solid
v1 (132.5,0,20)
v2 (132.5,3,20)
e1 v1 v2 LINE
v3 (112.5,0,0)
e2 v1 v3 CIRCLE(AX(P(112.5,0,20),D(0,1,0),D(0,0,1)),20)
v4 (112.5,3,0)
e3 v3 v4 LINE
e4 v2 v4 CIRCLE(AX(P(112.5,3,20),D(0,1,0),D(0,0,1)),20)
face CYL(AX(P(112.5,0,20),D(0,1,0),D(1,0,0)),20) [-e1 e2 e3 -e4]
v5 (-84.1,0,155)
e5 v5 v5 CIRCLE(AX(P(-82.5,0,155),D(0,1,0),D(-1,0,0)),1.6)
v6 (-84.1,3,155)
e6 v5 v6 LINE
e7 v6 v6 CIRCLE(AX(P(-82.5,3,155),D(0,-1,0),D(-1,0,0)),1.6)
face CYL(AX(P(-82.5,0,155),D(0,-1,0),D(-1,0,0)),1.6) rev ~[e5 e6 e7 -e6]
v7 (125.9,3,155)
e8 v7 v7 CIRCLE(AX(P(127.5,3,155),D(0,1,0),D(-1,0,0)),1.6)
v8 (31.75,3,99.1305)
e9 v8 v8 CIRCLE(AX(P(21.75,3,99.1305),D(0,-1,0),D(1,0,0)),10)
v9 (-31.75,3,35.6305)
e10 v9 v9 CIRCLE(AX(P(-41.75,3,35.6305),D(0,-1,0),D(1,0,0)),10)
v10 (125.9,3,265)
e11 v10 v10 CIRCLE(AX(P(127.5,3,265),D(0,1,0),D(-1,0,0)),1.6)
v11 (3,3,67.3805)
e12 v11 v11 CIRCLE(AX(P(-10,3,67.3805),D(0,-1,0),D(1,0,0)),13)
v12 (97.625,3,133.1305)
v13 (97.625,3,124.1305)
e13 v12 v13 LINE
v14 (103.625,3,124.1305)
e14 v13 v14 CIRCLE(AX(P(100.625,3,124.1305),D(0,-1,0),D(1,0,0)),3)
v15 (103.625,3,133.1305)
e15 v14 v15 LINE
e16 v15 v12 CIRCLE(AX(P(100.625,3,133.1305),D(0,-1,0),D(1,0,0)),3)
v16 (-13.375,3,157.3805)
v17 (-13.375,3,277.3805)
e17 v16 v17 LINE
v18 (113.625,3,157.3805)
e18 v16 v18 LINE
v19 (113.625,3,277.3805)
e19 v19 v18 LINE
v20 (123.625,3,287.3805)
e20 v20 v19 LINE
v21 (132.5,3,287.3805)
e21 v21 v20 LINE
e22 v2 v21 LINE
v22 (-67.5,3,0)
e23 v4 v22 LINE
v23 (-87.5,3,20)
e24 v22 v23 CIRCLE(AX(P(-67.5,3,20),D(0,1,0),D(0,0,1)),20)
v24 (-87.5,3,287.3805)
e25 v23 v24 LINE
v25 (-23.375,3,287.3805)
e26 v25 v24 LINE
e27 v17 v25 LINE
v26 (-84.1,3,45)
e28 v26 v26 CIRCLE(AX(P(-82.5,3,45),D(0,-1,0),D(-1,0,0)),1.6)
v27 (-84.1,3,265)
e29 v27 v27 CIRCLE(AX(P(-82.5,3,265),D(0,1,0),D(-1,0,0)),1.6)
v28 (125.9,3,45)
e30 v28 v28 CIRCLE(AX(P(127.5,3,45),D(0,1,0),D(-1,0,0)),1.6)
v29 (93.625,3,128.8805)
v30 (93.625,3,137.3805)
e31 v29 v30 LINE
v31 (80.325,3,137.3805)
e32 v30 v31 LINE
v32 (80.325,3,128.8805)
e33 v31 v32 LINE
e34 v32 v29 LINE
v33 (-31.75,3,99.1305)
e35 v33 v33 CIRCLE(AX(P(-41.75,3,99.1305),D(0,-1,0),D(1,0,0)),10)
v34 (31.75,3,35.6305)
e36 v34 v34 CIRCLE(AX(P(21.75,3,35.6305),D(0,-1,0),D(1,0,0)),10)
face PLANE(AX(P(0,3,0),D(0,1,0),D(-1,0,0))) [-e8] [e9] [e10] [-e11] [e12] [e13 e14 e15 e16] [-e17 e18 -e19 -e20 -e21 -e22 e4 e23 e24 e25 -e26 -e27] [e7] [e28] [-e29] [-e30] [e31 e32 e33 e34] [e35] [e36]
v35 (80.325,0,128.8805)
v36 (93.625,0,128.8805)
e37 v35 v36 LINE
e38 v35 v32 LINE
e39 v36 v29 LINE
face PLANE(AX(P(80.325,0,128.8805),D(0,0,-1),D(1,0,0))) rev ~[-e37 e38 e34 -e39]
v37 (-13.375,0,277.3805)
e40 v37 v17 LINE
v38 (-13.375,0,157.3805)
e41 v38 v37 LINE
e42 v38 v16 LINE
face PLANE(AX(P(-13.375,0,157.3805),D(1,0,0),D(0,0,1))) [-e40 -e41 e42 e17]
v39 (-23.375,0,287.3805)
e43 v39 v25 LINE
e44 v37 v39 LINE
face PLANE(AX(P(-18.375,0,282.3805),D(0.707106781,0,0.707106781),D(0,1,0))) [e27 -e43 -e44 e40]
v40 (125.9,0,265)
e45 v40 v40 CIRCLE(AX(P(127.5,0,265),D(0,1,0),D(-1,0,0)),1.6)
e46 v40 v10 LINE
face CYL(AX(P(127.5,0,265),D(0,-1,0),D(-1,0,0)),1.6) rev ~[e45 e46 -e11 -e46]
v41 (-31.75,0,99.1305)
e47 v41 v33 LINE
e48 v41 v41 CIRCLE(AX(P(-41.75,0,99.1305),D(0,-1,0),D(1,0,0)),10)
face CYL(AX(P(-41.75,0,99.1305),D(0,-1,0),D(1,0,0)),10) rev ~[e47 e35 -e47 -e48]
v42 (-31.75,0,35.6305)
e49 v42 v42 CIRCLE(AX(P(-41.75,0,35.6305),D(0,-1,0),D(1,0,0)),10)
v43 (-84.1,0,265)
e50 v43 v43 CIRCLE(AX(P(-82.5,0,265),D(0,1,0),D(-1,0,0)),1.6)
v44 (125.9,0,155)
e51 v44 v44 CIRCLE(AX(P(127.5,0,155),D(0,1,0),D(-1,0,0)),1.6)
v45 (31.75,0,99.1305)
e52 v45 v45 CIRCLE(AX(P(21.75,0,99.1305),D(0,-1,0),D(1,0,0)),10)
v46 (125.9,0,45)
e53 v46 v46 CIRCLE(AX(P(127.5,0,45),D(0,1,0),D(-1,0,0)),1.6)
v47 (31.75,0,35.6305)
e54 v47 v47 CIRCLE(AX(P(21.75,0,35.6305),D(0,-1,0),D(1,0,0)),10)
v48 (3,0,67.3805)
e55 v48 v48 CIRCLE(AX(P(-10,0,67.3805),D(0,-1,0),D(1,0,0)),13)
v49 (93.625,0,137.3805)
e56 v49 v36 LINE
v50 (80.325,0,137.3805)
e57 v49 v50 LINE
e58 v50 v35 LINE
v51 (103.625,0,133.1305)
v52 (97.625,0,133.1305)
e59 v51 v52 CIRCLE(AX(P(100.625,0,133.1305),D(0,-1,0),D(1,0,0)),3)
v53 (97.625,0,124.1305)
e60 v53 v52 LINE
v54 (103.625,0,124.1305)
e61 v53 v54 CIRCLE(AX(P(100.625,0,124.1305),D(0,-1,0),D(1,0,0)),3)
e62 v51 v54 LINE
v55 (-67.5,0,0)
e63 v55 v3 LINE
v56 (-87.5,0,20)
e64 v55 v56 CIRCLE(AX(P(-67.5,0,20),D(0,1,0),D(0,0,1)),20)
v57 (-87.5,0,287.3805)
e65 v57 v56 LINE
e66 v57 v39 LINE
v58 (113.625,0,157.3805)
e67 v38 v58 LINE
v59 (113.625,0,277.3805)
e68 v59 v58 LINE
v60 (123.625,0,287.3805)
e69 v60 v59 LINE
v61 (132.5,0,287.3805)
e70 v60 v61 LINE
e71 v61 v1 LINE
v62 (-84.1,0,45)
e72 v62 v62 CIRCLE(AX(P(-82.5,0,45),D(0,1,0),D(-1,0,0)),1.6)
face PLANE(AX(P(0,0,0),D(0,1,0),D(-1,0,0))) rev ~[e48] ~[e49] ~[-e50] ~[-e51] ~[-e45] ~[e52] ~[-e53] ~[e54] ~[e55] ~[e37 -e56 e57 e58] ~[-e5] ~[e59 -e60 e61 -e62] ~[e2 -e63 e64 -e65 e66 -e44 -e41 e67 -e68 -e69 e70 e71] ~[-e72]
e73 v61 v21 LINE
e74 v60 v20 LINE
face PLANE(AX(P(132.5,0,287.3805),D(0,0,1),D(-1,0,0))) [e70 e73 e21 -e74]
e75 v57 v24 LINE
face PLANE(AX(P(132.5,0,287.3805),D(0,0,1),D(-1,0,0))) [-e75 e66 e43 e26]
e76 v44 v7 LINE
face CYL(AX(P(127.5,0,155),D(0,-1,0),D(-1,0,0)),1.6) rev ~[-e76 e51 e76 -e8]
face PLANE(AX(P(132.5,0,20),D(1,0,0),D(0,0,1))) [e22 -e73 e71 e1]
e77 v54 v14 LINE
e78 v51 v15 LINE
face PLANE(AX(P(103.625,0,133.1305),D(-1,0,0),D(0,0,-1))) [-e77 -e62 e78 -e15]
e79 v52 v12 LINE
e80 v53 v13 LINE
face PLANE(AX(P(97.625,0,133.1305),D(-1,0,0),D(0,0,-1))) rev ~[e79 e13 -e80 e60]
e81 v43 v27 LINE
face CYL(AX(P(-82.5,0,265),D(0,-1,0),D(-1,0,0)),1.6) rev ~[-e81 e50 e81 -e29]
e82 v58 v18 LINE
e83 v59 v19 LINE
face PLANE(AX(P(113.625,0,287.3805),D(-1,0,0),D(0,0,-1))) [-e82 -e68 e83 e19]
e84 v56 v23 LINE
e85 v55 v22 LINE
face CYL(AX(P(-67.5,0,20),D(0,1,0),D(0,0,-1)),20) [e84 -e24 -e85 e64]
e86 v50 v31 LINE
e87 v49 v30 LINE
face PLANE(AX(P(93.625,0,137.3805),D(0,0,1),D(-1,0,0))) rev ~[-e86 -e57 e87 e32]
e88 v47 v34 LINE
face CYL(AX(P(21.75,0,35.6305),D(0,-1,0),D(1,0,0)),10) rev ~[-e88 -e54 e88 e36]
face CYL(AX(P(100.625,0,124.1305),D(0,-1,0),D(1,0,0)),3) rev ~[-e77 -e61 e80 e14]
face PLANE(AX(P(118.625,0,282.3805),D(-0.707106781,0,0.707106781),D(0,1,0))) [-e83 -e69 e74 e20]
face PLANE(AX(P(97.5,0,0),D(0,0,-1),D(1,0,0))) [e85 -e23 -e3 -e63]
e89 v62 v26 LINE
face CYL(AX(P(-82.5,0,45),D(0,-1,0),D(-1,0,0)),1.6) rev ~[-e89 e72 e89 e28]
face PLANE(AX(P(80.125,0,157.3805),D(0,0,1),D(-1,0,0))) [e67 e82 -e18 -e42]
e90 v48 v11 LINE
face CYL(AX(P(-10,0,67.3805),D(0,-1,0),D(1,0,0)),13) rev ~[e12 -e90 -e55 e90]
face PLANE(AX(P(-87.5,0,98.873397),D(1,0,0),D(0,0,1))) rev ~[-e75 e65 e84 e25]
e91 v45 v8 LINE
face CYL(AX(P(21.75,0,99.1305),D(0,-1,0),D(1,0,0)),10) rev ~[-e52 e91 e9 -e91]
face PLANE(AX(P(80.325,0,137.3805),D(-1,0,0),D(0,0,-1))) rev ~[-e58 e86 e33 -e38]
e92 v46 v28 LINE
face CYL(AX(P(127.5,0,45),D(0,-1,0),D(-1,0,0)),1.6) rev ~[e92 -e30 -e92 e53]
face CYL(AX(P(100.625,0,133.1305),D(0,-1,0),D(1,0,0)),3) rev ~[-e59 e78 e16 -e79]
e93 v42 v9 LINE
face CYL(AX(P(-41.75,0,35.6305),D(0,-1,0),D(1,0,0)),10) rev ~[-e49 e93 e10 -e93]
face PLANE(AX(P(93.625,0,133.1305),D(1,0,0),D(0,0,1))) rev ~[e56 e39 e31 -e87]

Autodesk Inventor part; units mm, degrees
ref_plane "YZ Plane" through (0, 0, 0) normal (1, 0, 0) x (0, 1, 0)
ref_plane "XZ Plane" through (0, 0, 0) normal (0, 1, 0) x (-1, 0, 0)
ref_plane "XY Plane" through (0, 0, 0) normal (0, 0, 1) x (1, 0, 0)
sketch "Sketch1" plane through (0, 0, 0) normal (0, 1, 0) x (-1, 0, 0)
  line L0 (-132.5, 287.3805) -> (-122.5, 287.3805)
  line L1 (-132.5, 20) -> (-132.5, 287.3805)
  line L2 (-122.5, 20) -> (-122.5, 287.3805)
  line L3 (77.5, 287.3805) -> (87.5, 287.3805)
  line L4 (77.5, 20) -> (77.5, 287.3805)
  line L5 (87.5, 20) -> (87.5, 287.3805)
  line L6 (82.5, 0) -> (127.5, 0) construction
  line L7 (-132.5, 20) -> (-132.5, 287.3805)
  line L8 (82.5, 45) -> (-127.5, 45)
  line L9 (82.5, 155) -> (-127.5, 155)
  circle A0 centre (-127.5, 265) radius 1.6
  circle A1 centre (-127.5, 155) radius 1.6
  circle A2 centre (-127.5, 45) radius 1.6
  circle A3 centre (82.5, 45) radius 1.6
  circle A4 centre (82.5, 155) radius 1.6
  circle A5 centre (82.5, 265) radius 1.6
  line L10 (-132.5, 287.3805) -> (87.5, 287.3805)
  line L11 (87.5, 287.3805) -> (87.5, 0)
  line L12 (87.5, 0) -> (-132.5, 0)
  line L13 (-132.5, 0) -> (-132.5, 287.3805)
  line L14 (87.5, 0) -> (-132.5, 0)
  line L15 (-132.5, 0) -> (-132.5, -22.8)
  line L16 (-132.5, -22.8) -> (87.5, -22.8)
  line L17 (87.5, -22.8) -> (87.5, 0)
  arc A6 (6, 100) -> (0, 94) centre (6, 94) ccw
  line L18 (0, 0) -> (0, 94)
  line L19 (0, 0) -> (90, 0)
  line L20 (90, 0) -> (90, 94)
  arc A7 (90, 94) -> (84, 100) centre (84, 94) ccw
  line L21 (6, 100) -> (84, 100)
  circle A8 centre (45, 47.3805) radius 11
  circle A9 centre (76.75, 79.1305) radius 5.75
  circle A10 centre (13.25, 15.6305) radius 5.75
  circle A11 centre (76.75, 15.6305) radius 5.75
  circle A12 centre (13.25, 79.1305) radius 5.75
  circle A13 centre (117.5, 135) radius 1.8
  line L22 (112.5, 267.3805) -> (122.5, 267.3805)
  line L23 (112.5, 0) -> (112.5, 267.3805)
  line L24 (112.5, 0) -> (122.5, 0)
  line L25 (122.5, 0) -> (122.5, 267.3805)
  circle A14 centre (117.5, 25) radius 1.8
  circle A15 centre (117.5, 245) radius 1.8
  circle A16 centre (-92.5, 135) radius 1.8
  line L26 (-97.5, 267.3805) -> (-87.5, 267.3805)
  line L27 (-97.5, 0) -> (-97.5, 267.3805)
  line L28 (-97.5, 0) -> (-87.5, 0)
  line L29 (-87.5, 0) -> (-87.5, 267.3805)
  circle A17 centre (-92.5, 245) radius 1.8
  circle A18 centre (-92.5, 25) radius 1.8
  point P0 (-62.5, 0)
  point P1 (52.5, -20)
  dimension "d0" = 45
  dimension "d2" = 110
  dimension "d4" = 3.2
  dimension "d5" = 3.2
  dimension "d6" = 3.2
  dimension "d7" = 3.2
  dimension "d8" = 3.2
  dimension "d9" = 3.2
  dimension "d12" = 22.8
extrude "Extrusion1" add sketch "Sketch1" along normal blind 3 contours L0 L2 L8 L27 L12 L13 L1 | L10 L4 L9 L29 L26 L27 L2 | L9 L27 L8 L2 | L3 L5 A7 L21 L4 | L27 L26 L29 L9 | L9 L29 L8 L27 | L4 L21 A6 L18 L8 L29 L9 | L27 L8 L29 L12 | L5 L11 L12 L18 L8 A8 L4 A9 L21 A7 | L4 A9 L8 A8 L18 A6 L21 | L29 L8 L18 L12 | A9 L4 | L4 A9 | A8 L8 | L8 A8 | A10 | A11 | A12 | A16 | A17 | A18
fillet "Fillet1" radius 20 2 edges at (132.5, 1.5, 0) (-87.5, 1.5, 0)
sketch "Sketch4" plane through (0, 0, 0) normal (0, -1, 0) x (1, 0, 0)
  line L0 (68.5, 205.2102) -> (31.5, 205.2102)
  line L1 (78.5, 192.2868) -> (21.5, 192.2868)
  line L2 (21.5, 205.2102) -> (31.5, 205.2102)
  line L3 (68.5, 205.2102) -> (78.5, 205.2102)
  line L4 (78.5, 205.2102) -> (78.5, 192.2868)
  line L5 (21.5, 192.2868) -> (21.5, 205.2102)
  circle A0 centre (21.75, 99.1305) radius 7.65
  circle A1 centre (-41.75, 99.1305) radius 7.65
  circle A2 centre (21.75, 35.6305) radius 7.65
  arc A3 (10, 67.3805) -> (-30, 67.3805) centre (-10, 67.3805) ccw
  line L6 (10, 67.3805) -> (10, -32.6195)
  line L7 (-30, -32.6195) -> (-30, 67.3805)
  circle A4 centre (-41.75, 35.6305) radius 7.65
  line L8 (-87.5, 20) -> (-87.5, 287.3805)
  line L9 (-87.5, 287.3805) -> (132.5, 287.3805)
  line L10 (132.5, 287.3805) -> (132.5, 20)
  line L11 (112.5, 0) -> (-67.5, 0)
  line L12 (-87.5, 20) -> (-87.5, 287.3805) projected
  line L13 (-87.5, 287.3805) -> (132.5, 287.3805) projected
  circle A5 centre (-41.75, 99.1305) radius 10
  circle A6 centre (21.75, 99.1305) radius 10
  circle A7 centre (-41.75, 35.6305) radius 10
  circle A8 centre (21.75, 35.6305) radius 10
  line L14 (-87.5, 287.3805) -> (132.5, 287.3805) projected
  line L15 (21.75, 287.3805) -> (78.5, 287.3805)
  line L16 (78.5, 287.3805) -> (78.5, 157.3805)
  line L17 (78.5, 157.3805) -> (21.75, 157.3805)
  line L18 (21.75, 157.3805) -> (21.75, 287.3805)
  circle A9 centre (-10, 67.3805) radius 13
  line L19 (80.125, 157.3805) -> (20.125, 157.3805)
  line L20 (20.125, 157.3805) -> (20.125, 287.3805)
  line L21 (20.125, 287.3805) -> (80.125, 287.3805)
  line L22 (80.125, 287.3805) -> (80.125, 157.3805)
  line L23 (80.125, 157.3805) -> (20.125, 287.3805) construction
  line L24 (20.125, 157.3805) -> (80.125, 287.3805) construction
  line L25 (-13.375, 287.3805) -> (113.625, 287.3805)
  line L26 (113.625, 287.3805) -> (113.625, 157.3805)
  line L27 (113.625, 157.3805) -> (-13.375, 157.3805)
  line L28 (-13.375, 157.3805) -> (-13.375, 287.3805)
  line L29 (-13.375, 287.3805) -> (113.625, 157.3805) construction
  line L30 (113.625, 287.3805) -> (-13.375, 157.3805) construction
  point P0 (0, 0)
  point P1 (50.125, 222.3805)
  dimension "d24" = 20
  dimension "d25" = 20
  dimension "d26" = 20
  dimension "d27" = 20
  dimension "d28" = 130
  dimension "d29" = 26
  dimension "d36" = 60
  dimension "d37" = 130
  dimension "d38" = 127
extrude "Extrusion3" cut sketch "Sketch4" against normal up to surface (3 mm away) contours L3 L4 L1 L18 L2 L0 | L0 L2 L18 L9 L16 L3 | L16 L9 L22 L19 L4 | L18 L1 L5 L2 | L2 L5 L1 L18 L19 L20 L9 | L16 L17 L18 L1 | L9 L26 L27 L22 | L20 L27 L28 L9 | A0 | A1 | A2 | A4 | A5 | A6 | A7 | A8 | A9
chamfer "Chamfer1" distance 10 angle 45 2 edges at (-13.375, 1.5, 287.3805) (113.625, 1.5, 287.3805)
sketch "Sketch5" plane through (0, 0, 0) normal (0, -1, 0) x (1, 0, 0)
  line L0 (113.625, 157.3805) -> (-13.375, 157.3805) projected
  line L1 (113.625, 157.3805) -> (93.625, 157.3805)
  line L2 (93.625, 157.3805) -> (93.625, 137.3805)
  line L3 (93.625, 137.3805) -> (80.325, 137.3805)
  line L4 (80.325, 137.3805) -> (80.325, 128.8805)
  line L5 (80.325, 128.8805) -> (93.625, 128.8805)
  line L6 (93.625, 128.8805) -> (93.625, 137.3805)
  line L7 (93.625, 133.1305) -> (100.625, 133.1305)
  circle A0 centre (100.625, 133.1305) radius 3
  line L8 (97.625, 133.1305) -> (97.625, 127.1305)
  line L9 (103.625, 133.1305) -> (103.625, 127.1305)
  line L10 (100.625, 133.1305) -> (100.625, 124.1305)
  circle A1 centre (100.625, 124.1305) radius 3
  line L11 (97.625, 127.1305) -> (97.625, 124.1305)
  line L12 (103.625, 127.1305) -> (103.625, 124.1305)
  point P0 (0, 0)
  dimension "d39" = 20
  dimension "d40" = 20
  dimension "d41" = 13.3
  dimension "d42" = 8.5
  dimension "d45" = 7
  dimension "d46" = 6
  dimension "d47" = 6
  dimension "d48" = 6
  dimension "d49" = 9
extrude "Extrusion4" cut sketch "Sketch5" against normal up to surface (3 mm away)
equation "\"BendRadius\" = Thickness"
equation "\"BendReliefWidth\" = Thickness"
equation "\"BendReliefDepth\" = 0.5 * Thickness"
equation "\"CornerReliefSize\" = 4 * Thickness"
equation "\"MinimumRemnant\" = 2 * Thickness"
equation "\"TransitionRadius\" = BendRadius"
equation "\"JacobiRadiusSize\" = Thickness"
equation "\"GapSize\" = Thickness"
equation "\"Thickness\" = 0.5"
properties part number "obudowa_zewnetrzna_tyl_korba" material "ABS Plastic"
